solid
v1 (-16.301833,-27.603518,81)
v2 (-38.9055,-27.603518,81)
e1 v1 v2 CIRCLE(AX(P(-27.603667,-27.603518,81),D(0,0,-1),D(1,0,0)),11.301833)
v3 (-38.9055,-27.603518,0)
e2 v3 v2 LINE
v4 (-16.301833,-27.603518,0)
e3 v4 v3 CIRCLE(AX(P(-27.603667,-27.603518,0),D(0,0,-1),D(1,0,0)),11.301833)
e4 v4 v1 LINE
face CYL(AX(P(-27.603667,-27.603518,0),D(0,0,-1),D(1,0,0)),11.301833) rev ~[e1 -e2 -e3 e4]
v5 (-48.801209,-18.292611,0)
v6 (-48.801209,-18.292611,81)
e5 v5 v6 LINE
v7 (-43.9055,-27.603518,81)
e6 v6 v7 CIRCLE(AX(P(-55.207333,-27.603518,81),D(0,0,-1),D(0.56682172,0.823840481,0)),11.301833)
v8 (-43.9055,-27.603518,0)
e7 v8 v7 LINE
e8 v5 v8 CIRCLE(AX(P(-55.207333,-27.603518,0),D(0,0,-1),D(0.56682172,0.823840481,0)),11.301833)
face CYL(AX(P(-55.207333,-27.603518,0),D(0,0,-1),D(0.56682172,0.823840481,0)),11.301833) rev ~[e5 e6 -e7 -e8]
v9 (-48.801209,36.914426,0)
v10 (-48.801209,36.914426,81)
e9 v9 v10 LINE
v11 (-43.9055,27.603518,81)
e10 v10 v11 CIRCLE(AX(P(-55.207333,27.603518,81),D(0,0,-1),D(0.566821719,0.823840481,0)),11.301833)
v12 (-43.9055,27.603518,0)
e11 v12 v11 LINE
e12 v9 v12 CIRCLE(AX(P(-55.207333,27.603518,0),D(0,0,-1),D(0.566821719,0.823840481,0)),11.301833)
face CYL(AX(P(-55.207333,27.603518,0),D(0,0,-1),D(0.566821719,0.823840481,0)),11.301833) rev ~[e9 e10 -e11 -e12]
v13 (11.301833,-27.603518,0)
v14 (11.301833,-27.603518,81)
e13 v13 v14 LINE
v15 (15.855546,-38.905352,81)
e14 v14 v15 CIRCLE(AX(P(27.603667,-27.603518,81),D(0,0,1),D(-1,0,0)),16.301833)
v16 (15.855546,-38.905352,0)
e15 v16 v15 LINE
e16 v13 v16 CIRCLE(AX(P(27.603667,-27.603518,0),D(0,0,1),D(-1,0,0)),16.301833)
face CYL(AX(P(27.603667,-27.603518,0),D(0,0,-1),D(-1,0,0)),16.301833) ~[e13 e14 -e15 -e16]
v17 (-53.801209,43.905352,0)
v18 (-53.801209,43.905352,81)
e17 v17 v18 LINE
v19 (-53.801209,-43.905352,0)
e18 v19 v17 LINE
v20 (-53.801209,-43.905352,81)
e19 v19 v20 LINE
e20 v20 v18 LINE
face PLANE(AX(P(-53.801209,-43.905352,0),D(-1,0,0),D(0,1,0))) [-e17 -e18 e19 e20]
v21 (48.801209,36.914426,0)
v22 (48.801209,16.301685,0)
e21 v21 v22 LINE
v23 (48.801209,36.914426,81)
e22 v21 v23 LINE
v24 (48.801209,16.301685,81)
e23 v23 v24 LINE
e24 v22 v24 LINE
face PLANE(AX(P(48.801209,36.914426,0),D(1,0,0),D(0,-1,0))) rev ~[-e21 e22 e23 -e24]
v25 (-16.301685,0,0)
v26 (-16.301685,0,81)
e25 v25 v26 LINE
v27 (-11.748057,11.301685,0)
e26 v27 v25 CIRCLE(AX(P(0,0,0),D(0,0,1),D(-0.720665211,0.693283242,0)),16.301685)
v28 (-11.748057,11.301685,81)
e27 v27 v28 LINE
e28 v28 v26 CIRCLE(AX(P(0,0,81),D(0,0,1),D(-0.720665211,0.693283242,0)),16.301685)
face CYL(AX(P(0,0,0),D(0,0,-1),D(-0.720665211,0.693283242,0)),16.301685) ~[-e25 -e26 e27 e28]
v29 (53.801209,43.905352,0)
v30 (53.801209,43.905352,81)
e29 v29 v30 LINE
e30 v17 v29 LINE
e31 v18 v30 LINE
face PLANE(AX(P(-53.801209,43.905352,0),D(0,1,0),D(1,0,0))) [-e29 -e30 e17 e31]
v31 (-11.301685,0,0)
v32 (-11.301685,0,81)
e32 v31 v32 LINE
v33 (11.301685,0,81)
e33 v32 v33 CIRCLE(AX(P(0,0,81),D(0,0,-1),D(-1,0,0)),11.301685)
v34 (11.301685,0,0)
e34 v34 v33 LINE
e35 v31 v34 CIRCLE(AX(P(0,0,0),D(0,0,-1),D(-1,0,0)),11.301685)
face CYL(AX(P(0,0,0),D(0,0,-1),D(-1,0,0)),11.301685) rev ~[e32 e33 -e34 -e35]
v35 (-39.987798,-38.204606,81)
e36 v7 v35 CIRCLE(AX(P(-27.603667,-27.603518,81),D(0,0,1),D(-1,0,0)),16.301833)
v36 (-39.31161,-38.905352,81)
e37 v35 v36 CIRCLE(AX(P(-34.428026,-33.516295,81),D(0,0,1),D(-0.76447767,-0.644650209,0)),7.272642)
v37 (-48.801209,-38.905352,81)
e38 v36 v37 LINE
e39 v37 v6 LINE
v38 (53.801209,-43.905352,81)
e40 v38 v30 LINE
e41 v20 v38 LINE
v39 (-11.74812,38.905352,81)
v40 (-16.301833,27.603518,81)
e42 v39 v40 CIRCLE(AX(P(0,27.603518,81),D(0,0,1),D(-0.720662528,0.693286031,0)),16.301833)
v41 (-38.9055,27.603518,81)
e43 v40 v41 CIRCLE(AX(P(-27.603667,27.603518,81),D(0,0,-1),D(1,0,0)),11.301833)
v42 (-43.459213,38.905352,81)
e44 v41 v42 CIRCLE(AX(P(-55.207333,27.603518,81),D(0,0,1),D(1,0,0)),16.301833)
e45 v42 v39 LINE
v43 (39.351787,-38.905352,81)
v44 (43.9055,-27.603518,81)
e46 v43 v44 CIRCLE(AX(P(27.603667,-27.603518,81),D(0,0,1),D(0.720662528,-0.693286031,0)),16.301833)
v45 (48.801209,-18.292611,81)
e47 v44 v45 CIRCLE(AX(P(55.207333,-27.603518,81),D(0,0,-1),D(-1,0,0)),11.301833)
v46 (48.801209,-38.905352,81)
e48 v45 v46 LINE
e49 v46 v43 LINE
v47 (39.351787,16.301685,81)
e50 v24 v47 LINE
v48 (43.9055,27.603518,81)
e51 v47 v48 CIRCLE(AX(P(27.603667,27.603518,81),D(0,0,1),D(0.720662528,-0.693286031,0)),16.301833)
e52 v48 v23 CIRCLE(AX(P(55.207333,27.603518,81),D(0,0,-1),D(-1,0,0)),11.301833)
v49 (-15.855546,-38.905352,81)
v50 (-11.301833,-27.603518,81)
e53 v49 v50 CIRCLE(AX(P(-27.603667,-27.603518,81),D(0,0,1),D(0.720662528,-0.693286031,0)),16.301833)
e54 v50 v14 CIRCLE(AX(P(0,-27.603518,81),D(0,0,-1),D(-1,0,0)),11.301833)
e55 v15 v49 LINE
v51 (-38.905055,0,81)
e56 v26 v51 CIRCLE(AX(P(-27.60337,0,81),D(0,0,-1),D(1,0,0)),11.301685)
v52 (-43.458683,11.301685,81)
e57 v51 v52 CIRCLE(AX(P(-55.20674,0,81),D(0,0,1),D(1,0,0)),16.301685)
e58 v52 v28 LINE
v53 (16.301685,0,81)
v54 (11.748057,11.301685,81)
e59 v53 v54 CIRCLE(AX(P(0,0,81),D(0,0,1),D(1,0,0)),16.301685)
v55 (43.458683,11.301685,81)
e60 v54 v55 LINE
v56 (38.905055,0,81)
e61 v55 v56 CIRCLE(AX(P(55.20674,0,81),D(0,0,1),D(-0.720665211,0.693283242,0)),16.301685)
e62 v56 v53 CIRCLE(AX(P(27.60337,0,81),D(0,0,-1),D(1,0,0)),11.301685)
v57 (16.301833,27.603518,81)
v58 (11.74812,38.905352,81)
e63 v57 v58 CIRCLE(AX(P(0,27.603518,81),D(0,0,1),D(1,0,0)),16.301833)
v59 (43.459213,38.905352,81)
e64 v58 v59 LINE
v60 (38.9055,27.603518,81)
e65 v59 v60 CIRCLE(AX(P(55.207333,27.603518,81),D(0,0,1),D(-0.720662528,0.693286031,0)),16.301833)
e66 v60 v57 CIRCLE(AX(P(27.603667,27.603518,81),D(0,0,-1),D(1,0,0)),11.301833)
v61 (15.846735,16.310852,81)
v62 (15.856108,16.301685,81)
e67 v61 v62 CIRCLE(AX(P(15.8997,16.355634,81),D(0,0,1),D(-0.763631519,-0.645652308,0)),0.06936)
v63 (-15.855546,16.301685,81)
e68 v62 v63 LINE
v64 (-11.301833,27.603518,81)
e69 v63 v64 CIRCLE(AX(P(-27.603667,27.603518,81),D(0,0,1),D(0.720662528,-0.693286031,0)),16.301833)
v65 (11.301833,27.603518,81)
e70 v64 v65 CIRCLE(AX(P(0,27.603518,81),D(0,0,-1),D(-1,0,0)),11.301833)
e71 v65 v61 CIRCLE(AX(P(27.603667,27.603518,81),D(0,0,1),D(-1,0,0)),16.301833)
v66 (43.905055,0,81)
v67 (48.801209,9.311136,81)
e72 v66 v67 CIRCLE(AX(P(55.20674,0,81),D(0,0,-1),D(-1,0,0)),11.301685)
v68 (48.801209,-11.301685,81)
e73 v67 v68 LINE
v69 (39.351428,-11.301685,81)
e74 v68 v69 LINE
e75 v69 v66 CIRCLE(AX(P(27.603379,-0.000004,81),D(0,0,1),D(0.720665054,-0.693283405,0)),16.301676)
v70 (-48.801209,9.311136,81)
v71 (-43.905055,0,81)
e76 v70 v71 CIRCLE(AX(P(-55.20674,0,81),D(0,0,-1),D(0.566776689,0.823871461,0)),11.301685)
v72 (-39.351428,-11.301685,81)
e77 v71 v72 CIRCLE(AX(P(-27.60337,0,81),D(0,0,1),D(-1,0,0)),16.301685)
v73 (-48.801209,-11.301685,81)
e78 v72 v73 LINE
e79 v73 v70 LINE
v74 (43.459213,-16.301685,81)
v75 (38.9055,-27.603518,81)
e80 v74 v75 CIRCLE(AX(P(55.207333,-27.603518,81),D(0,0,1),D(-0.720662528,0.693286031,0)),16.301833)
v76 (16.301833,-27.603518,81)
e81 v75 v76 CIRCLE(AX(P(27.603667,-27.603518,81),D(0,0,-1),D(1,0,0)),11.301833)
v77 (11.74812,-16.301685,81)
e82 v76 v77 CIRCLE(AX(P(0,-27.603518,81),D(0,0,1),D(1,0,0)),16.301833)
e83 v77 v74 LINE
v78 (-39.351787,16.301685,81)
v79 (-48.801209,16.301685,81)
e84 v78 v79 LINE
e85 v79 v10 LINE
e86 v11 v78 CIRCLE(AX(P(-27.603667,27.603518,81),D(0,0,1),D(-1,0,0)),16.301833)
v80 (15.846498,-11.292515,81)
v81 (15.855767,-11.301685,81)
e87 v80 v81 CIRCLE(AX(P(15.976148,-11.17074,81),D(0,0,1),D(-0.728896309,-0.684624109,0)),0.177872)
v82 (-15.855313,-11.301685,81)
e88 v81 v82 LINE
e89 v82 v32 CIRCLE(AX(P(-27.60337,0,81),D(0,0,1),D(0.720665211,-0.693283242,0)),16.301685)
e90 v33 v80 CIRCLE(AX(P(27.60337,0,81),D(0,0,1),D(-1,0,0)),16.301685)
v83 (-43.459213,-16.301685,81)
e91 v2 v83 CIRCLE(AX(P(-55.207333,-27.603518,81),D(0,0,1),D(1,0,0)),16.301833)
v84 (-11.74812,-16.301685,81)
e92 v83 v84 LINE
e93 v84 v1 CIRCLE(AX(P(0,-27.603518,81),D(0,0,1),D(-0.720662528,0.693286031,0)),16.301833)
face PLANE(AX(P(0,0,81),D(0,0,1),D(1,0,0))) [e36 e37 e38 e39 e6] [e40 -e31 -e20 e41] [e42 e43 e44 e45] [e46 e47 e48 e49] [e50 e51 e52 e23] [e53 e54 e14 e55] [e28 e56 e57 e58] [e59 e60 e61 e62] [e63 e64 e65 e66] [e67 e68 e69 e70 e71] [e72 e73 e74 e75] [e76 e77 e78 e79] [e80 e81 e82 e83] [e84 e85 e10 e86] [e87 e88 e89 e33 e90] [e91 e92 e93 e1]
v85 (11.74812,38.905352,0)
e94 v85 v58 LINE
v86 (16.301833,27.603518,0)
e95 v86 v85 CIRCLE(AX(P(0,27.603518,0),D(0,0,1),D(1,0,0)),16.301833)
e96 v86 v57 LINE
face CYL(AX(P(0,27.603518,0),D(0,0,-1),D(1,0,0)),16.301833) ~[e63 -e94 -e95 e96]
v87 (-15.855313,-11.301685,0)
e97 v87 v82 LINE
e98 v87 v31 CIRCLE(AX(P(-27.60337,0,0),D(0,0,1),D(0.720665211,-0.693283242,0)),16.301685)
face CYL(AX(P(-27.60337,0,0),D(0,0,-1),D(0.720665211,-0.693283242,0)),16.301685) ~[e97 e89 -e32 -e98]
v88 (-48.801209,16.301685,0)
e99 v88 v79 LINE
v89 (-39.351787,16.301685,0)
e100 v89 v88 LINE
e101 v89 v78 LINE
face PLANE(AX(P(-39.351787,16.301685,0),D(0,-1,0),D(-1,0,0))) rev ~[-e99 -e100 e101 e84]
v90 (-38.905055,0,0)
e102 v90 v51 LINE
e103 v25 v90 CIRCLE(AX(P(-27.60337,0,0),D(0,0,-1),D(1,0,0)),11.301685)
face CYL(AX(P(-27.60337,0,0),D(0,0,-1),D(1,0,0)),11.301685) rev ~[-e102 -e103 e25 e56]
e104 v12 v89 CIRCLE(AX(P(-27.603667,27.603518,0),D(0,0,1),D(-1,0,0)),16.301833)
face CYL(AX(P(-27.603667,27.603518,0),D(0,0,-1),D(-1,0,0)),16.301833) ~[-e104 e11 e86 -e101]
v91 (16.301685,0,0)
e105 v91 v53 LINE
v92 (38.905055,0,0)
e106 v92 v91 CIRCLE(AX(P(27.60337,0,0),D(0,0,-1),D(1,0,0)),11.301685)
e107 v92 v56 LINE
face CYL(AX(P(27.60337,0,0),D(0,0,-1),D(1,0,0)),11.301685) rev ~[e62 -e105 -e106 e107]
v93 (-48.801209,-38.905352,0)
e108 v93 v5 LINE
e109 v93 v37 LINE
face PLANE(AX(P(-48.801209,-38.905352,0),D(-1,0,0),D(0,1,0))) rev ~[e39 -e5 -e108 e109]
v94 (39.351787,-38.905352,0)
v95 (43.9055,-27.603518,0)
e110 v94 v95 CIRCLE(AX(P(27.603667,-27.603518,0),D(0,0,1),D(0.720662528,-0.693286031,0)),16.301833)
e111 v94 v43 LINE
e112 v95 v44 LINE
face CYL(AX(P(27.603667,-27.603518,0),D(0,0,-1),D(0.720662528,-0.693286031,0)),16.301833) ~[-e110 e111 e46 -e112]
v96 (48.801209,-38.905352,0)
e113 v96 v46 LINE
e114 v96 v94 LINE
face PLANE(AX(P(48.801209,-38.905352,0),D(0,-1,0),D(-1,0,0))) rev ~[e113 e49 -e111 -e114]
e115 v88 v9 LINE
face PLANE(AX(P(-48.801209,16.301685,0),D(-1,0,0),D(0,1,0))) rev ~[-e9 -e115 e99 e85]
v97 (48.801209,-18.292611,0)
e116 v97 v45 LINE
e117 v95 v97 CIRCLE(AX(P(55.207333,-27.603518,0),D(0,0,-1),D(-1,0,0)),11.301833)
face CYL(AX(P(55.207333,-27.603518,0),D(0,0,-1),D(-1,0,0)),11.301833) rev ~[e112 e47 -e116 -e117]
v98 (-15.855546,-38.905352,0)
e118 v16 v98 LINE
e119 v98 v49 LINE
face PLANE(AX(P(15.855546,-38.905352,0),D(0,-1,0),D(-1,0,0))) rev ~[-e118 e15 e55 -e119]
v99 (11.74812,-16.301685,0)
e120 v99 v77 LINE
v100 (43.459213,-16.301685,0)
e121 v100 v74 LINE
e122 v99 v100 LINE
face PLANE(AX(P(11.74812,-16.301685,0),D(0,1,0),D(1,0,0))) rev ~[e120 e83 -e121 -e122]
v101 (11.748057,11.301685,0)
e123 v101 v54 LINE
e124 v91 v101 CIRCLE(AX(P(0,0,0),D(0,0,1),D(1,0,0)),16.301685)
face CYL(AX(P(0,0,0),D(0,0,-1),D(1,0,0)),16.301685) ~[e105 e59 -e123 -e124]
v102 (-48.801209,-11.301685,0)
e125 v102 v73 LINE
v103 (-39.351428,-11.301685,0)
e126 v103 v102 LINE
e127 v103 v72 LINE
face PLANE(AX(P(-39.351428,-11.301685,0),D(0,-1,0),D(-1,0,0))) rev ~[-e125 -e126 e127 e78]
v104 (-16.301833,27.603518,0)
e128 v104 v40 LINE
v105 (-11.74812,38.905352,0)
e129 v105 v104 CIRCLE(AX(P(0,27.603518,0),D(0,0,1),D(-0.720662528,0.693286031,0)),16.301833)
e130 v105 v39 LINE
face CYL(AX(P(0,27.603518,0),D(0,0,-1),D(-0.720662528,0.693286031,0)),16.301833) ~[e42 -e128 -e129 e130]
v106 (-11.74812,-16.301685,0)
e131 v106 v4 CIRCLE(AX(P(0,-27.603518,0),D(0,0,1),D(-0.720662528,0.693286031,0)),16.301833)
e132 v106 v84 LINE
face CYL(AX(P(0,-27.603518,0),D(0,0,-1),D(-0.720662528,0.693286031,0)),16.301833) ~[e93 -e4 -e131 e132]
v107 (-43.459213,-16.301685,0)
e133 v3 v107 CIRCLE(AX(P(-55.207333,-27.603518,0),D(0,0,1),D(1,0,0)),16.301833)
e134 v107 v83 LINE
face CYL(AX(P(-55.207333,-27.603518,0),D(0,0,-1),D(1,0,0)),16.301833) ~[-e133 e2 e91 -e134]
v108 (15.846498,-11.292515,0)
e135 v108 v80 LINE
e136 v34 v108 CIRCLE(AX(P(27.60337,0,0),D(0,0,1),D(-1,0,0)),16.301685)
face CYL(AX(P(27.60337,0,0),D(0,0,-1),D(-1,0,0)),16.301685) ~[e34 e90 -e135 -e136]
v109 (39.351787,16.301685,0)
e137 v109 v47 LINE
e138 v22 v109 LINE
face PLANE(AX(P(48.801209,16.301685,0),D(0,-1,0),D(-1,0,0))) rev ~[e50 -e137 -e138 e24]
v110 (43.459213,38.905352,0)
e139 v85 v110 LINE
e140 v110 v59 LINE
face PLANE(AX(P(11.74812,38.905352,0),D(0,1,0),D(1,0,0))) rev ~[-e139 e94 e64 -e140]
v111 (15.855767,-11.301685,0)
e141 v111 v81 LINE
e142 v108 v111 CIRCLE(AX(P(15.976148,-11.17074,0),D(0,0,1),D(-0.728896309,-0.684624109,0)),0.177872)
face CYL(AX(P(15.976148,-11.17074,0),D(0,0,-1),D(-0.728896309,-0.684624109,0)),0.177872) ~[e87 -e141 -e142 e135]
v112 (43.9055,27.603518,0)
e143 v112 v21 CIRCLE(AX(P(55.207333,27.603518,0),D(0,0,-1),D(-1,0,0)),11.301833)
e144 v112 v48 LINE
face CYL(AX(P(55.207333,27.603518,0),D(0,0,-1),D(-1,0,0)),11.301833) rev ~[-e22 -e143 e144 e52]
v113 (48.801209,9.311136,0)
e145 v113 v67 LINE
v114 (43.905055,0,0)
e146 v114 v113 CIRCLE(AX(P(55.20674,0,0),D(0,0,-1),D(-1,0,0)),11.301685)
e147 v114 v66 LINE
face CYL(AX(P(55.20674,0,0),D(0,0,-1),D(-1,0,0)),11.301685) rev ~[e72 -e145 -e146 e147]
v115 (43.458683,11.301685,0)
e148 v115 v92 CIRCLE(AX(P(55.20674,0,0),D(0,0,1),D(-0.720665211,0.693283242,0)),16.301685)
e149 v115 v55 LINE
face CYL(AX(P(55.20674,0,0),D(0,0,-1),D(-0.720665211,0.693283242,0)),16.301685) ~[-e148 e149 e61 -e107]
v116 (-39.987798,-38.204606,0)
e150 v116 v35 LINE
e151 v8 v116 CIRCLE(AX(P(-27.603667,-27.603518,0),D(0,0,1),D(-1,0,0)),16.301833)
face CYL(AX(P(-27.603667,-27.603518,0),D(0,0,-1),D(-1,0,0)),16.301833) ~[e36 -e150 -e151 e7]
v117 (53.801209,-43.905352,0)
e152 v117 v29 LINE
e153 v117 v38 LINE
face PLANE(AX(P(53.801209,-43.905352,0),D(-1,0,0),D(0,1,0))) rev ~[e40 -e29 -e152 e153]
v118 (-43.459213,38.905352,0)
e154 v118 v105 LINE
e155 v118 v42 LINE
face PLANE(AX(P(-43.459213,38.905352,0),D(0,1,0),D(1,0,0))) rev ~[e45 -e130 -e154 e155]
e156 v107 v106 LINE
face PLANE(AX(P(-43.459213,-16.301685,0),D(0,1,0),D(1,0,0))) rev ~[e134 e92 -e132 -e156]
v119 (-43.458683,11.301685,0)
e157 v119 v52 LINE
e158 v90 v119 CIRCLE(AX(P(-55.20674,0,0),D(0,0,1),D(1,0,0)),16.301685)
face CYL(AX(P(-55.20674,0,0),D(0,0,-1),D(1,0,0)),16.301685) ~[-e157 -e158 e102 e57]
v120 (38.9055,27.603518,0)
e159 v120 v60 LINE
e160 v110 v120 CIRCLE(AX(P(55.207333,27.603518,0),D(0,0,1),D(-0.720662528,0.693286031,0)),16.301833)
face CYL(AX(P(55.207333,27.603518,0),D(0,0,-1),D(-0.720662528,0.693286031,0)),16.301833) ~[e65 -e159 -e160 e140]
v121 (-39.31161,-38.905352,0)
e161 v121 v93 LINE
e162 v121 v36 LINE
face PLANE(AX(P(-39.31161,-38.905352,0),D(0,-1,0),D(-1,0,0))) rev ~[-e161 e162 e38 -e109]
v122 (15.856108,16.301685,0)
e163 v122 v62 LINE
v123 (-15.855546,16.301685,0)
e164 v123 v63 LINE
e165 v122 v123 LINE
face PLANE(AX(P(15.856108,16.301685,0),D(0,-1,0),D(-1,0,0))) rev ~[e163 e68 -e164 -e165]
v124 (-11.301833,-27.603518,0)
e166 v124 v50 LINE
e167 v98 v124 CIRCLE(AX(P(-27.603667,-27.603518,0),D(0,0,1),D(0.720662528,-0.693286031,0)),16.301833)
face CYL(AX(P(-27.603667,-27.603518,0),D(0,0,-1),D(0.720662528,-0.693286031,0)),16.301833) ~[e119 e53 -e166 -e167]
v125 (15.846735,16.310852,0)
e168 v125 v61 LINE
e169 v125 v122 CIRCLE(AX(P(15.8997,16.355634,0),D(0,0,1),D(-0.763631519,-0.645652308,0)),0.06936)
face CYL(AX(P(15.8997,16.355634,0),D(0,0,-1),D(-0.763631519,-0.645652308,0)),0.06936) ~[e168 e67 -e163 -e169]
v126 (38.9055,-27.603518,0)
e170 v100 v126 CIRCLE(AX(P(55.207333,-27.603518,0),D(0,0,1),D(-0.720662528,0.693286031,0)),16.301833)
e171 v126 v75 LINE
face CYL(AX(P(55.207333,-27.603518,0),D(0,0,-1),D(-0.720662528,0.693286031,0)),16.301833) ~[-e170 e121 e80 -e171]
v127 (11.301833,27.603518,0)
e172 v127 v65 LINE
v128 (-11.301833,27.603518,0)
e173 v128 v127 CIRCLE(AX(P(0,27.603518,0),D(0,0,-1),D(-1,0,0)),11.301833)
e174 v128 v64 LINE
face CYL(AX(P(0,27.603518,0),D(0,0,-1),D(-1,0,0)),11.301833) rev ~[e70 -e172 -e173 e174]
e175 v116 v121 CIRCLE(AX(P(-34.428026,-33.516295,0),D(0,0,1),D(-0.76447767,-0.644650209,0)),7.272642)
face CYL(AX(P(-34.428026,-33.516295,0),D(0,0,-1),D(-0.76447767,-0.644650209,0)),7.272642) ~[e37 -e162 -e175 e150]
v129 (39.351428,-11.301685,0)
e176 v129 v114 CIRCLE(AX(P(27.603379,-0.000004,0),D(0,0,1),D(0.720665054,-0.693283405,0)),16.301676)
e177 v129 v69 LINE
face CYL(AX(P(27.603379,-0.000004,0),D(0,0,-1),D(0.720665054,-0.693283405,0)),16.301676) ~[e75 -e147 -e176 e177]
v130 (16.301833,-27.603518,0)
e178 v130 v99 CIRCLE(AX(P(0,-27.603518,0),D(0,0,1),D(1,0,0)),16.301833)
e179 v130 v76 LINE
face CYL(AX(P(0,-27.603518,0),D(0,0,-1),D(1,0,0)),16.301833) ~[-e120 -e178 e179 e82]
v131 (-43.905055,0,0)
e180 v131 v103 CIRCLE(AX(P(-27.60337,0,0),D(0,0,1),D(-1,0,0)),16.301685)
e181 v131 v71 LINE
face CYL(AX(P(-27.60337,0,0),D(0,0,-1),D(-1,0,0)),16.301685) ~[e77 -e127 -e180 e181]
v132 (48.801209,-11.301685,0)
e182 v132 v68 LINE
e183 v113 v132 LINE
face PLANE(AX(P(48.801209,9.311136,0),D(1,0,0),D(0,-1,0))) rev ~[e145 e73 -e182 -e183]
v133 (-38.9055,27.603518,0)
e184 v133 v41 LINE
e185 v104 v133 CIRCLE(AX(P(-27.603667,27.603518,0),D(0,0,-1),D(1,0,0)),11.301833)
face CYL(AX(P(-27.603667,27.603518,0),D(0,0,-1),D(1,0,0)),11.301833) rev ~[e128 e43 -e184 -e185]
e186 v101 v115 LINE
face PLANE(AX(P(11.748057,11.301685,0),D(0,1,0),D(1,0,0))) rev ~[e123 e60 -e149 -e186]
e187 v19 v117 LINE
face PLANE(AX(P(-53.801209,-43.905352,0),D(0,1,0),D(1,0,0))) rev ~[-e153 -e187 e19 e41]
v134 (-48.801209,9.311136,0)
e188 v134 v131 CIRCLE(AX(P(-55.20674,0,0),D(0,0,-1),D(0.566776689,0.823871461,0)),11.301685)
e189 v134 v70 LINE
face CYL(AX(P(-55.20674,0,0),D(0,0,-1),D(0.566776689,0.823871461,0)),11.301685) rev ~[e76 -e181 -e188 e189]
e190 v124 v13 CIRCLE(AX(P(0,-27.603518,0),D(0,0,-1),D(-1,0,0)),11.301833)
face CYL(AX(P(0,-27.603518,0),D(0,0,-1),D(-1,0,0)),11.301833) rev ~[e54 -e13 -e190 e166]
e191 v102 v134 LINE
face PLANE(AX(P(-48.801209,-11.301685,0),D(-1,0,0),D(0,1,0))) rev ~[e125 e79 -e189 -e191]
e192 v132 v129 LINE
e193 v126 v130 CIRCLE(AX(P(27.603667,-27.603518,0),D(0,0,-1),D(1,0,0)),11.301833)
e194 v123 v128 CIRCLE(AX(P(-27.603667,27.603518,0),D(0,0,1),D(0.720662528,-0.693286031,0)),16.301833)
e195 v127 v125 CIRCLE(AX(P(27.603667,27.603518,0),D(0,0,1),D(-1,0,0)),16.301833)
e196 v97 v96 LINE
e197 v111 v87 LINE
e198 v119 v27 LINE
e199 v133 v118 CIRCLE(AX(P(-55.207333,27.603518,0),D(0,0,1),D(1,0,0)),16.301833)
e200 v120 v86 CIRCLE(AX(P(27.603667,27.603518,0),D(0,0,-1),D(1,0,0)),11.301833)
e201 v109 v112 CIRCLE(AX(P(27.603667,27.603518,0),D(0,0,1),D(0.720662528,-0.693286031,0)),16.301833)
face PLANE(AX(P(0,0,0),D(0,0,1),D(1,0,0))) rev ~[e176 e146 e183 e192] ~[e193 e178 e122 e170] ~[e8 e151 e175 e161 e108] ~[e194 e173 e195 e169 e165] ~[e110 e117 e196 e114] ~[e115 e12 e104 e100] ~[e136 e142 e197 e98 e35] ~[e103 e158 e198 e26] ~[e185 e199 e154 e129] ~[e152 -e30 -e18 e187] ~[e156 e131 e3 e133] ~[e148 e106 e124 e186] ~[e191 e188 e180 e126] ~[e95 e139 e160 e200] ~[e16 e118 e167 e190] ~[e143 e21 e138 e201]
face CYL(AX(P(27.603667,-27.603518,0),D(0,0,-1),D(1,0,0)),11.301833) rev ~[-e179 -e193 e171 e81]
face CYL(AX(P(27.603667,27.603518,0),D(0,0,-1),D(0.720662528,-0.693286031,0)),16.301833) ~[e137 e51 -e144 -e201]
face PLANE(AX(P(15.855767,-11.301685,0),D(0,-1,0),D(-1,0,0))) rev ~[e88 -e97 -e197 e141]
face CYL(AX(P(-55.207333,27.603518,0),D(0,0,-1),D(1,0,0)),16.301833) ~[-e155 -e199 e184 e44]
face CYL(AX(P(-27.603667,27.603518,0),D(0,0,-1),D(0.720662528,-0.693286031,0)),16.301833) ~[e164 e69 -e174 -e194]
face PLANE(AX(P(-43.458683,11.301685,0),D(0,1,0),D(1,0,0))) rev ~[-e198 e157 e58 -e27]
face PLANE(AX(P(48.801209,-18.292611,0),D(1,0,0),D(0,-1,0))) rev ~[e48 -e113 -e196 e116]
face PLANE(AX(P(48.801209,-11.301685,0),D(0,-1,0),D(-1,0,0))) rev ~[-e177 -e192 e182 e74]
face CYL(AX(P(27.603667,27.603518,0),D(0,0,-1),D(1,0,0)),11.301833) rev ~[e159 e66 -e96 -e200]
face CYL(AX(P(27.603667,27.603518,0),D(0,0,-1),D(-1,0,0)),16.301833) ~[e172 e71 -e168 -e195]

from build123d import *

# Parameters (mm, degrees)
F0_W     = 107.602417469
F0_H     = 87.8107035317
F1_DEPTH = 81


# Not quite as in the source:
# - ends of sketch curves that miss each other by under 0.0002 mm in the source are joined


with BuildPart() as f1:
    # F0 (on Top) → F1 (new body)
    with BuildSketch(Plane.XY):
        Rectangle(F0_W, F0_H)
        with BuildLine():
            Line((-43.4592129171, -38.9053517658), (-48.8012087345, -38.9053517658))
            Line((-48.8012087345, -38.9053517658), (-48.8012087345, -18.2926106175))
            ThreePointArc((-48.8012087345, -18.2926106175), (-45.2040241526, -22.3437425741), (-43.9055000032, -27.6035184325))
            ThreePointArc((-43.9055000032, -27.6035184325), (-42.8947395838, -33.2544350992), (-39.987798415, -38.2046056862))
            ThreePointArc((-39.987798415, -38.2046056862), (-39.6614460497, -38.566308994), (-39.3116101623, -38.9053517658))
            Line((-39.3116101623, -38.9053517658), (-43.4592129171, -38.9053517658))
        make_face(mode=Mode.SUBTRACT)
        with BuildLine():
            ThreePointArc((-38.9055000032, -27.6035184325), (-40.0867237079, -21.511151528), (-43.4592129171, -16.3016850991))
            Line((-43.4592129171, -16.3016850991), (-11.748120417, -16.3016850991))
            ThreePointArc((-11.748120417, -16.3016850991), (-15.120609628, -21.5111515275), (-16.3018333334, -27.6035184325))
            ThreePointArc((-16.3018333334, -27.6035184325), (-27.6036666683, -38.9053517674), (-38.9055000032, -27.6035184325))
        make_face(mode=Mode.SUBTRACT)
        with BuildLine():
            Line((-43.4586830682, -11.3016850991), (-48.8012087345, -11.3016850991))
            Line((-48.8012087345, -11.3016850991), (-48.8012087345, 9.3111358172))
            ThreePointArc((-48.8012087345, 9.3111358172), (-45.2037061615, 5.2599802444), (-43.9050552974, 0))
            ThreePointArc((-43.9050552974, 0), (-42.7238541219, -6.0922822479), (-39.3514275267, -11.3016850991))
            Line((-39.3514275267, -11.3016850991), (-43.4586830682, -11.3016850991))
        make_face(mode=Mode.SUBTRACT)
        with BuildLine():
            ThreePointArc((-11.3018333334, -27.6035184325), (0, -16.3016850991), (11.3018333333, -27.6035184325))
            ThreePointArc((11.3018333334, -27.6035184325), (12.4830570387, -33.6958853375), (15.8555462497, -38.9053517658))
            Line((15.8555462497, -38.9053517658), (-15.8555462474, -38.9053517658))
            ThreePointArc((-15.8555462474, -38.9053517658), (-12.4830570378, -33.6958853372), (-11.3018333334, -27.6035184325))
        make_face(mode=Mode.SUBTRACT)
        with BuildLine():
            ThreePointArc((38.9055, -27.6035184325), (27.6036666667, -38.9053517658), (16.3018333334, -27.6035184325))
            ThreePointArc((16.3018333334, -27.6035184325), (15.120609628, -21.5111515275), (11.748120417, -16.3016850991))
            Line((11.748120417, -16.3016850991), (43.4592129164, -16.3016850991))
            ThreePointArc((43.4592129164, -16.3016850991), (40.0867237054, -21.5111515275), (38.9055, -27.6035184325))
        make_face(mode=Mode.SUBTRACT)
        with BuildLine():
            ThreePointArc((43.9055, -27.6035184325), (45.2040241503, -22.3437425739), (48.8012087345, -18.2926106186))
            Line((48.8012087345, -18.2926106186), (48.8012087345, -38.9053517658))
            Line((48.8012087345, -38.9053517658), (43.4592129164, -38.9053517658))
            Line((43.4592129164, -38.9053517658), (39.3517870837, -38.9053517658))
            ThreePointArc((39.3517870837, -38.9053517658), (42.7242762947, -33.6958853375), (43.9055, -27.6035184325))
        make_face(mode=Mode.SUBTRACT)
        with BuildLine():
            Line((15.855319758, 11.3016850991), (43.4586830625, 11.3016850991))
            ThreePointArc((43.4586830625, 11.3016850991), (40.0862564691, 6.0922822475), (38.9050552942, 0))
            ThreePointArc((38.9050553006, 0), (27.6033701999, -11.3016851007), (16.3016850991, 0))
            ThreePointArc((16.3016850991, 0), (15.1204839236, 6.0922822479), (11.7480573284, 11.3016850991))
            Line((11.7480573284, 11.3016850991), (15.855319758, 11.3016850991))
        make_face(mode=Mode.SUBTRACT)
        with BuildLine():
            ThreePointArc((43.9050552942, 0), (45.2037061591, 5.2599802476), (48.8012087345, 9.3111358227))
            Line((48.8012087345, 9.3111358227), (48.8012087345, -11.3016850991))
            Line((48.8012087345, -11.3016850991), (43.4586830625, -11.3016850991))
            Line((43.4586830625, -11.3016850991), (39.3514275289, -11.3016850991))
            ThreePointArc((39.3514275289, -11.3016850991), (42.7238548196, -6.0922824277), (43.9050552942, 0))
        make_face(mode=Mode.SUBTRACT)
        with BuildLine():
            ThreePointArc((-16.3016850991, 0), (-27.6033701983, -11.3016850991), (-38.9050552974, 0))
            ThreePointArc((-38.9050552974, 0), (-40.086256473, 6.0922822479), (-43.4586830682, 11.3016850991))
            Line((-43.4586830682, 11.3016850991), (-15.8553128699, 11.3016850991))
            Line((-15.8553128699, 11.3016850991), (-11.7480573284, 11.3016850991))
            ThreePointArc((-11.7480573284, 11.3016850991), (-15.1204839236, 6.0922822479), (-16.3016850991, 0))
        make_face(mode=Mode.SUBTRACT)
        with BuildLine():
            Line((-48.8012087345, 16.3016850991), (-48.8012087345, 36.9144262464))
            ThreePointArc((-48.8012087345, 36.9144262464), (-45.2040241503, 32.8632942911), (-43.9055, 27.6035184325))
            ThreePointArc((-43.9055, 27.6035184325), (-42.7242762947, 21.5111515275), (-39.3517870837, 16.3016850991))
            Line((-39.3517870837, 16.3016850991), (-43.4592129164, 16.3016850991))
            Line((-43.4592129164, 16.3016850991), (-48.8012087345, 16.3016850991))
        make_face(mode=Mode.SUBTRACT)
        with BuildLine():
            ThreePointArc((-38.9055, 27.6035184325), (-40.0867237054, 33.6958853375), (-43.4592129164, 38.9053517658))
            Line((-43.4592129164, 38.9053517658), (-15.8555462497, 38.9053517658))
            Line((-15.8555462497, 38.9053517658), (-11.748120417, 38.9053517658))
            ThreePointArc((-11.748120417, 38.9053517658), (-15.120609628, 33.6958853375), (-16.3018333334, 27.6035184325))
            ThreePointArc((-16.3018333334, 27.6035184325), (-27.6036666667, 16.3016850991), (-38.9055, 27.6035184325))
        make_face(mode=Mode.SUBTRACT)
        with BuildLine():
            ThreePointArc((-11.3016850991, 0), (0, 11.3016850991), (11.3016850991, 0))
            ThreePointArc((11.3016850991, 0), (12.4805105623, -6.0863826289), (15.8464978932, -11.2925148079))
            ThreePointArc((15.8464978932, -11.2925148079), (15.8510483075, -11.2971849132), (15.8557668328, -11.3016850991))
            Line((15.8557668328, -11.3016850991), (-15.8553128699, -11.3016850991))
            ThreePointArc((-15.8553128699, -11.3016850991), (-12.4828862747, -6.0922822479), (-11.3016850991, 0))
        make_face(mode=Mode.SUBTRACT)
        with BuildLine():
            ThreePointArc((-11.3018333334, 27.6035184325), (0, 38.9053517658), (11.3018333334, 27.6035184325))
            ThreePointArc((11.3018333334, 27.6035184325), (12.4806822619, 21.5170487891), (15.8467347518, 16.310851698))
            ThreePointArc((15.8467347518, 16.310851698), (15.8512041563, 16.3060464442), (15.8561076969, 16.3016850991))
            Line((15.8561076969, 16.3016850991), (-15.8555462497, 16.3016850991))
            ThreePointArc((-15.8555462497, 16.3016850991), (-12.4830570387, 21.5111515275), (-11.3018333334, 27.6035184325))
        make_face(mode=Mode.SUBTRACT)
        with BuildLine():
            ThreePointArc((38.9055, 27.6035184325), (27.6036666667, 16.3016850991), (16.3018333334, 27.6035184325))
            ThreePointArc((16.3018333334, 27.6035184325), (15.120609628, 33.6958853375), (11.748120417, 38.9053517658))
            Line((11.748120417, 38.9053517658), (15.8555462497, 38.9053517658))
            Line((15.8555462497, 38.9053517658), (43.4592129164, 38.9053517658))
            ThreePointArc((43.4592129164, 38.9053517658), (40.0867237054, 33.6958853375), (38.9055, 27.6035184325))
        make_face(mode=Mode.SUBTRACT)
        with BuildLine():
            ThreePointArc((43.9055, 27.6035184325), (45.2040241503, 32.8632942911), (48.8012087345, 36.9144262464))
            Line((48.8012087345, 36.9144262464), (48.8012087345, 27.6035184325))
            Line((48.8012087345, 27.6035184325), (48.8012087345, 16.3016850991))
            Line((48.8012087345, 16.3016850991), (43.4592129164, 16.3016850991))
            Line((43.4592129164, 16.3016850991), (39.3517870837, 16.3016850991))
            ThreePointArc((39.3517870837, 16.3016850991), (42.7242762947, 21.5111515275), (43.9055, 27.6035184325))
        make_face(mode=Mode.SUBTRACT)
    extrude(amount=F1_DEPTH)


solid = f1.part
